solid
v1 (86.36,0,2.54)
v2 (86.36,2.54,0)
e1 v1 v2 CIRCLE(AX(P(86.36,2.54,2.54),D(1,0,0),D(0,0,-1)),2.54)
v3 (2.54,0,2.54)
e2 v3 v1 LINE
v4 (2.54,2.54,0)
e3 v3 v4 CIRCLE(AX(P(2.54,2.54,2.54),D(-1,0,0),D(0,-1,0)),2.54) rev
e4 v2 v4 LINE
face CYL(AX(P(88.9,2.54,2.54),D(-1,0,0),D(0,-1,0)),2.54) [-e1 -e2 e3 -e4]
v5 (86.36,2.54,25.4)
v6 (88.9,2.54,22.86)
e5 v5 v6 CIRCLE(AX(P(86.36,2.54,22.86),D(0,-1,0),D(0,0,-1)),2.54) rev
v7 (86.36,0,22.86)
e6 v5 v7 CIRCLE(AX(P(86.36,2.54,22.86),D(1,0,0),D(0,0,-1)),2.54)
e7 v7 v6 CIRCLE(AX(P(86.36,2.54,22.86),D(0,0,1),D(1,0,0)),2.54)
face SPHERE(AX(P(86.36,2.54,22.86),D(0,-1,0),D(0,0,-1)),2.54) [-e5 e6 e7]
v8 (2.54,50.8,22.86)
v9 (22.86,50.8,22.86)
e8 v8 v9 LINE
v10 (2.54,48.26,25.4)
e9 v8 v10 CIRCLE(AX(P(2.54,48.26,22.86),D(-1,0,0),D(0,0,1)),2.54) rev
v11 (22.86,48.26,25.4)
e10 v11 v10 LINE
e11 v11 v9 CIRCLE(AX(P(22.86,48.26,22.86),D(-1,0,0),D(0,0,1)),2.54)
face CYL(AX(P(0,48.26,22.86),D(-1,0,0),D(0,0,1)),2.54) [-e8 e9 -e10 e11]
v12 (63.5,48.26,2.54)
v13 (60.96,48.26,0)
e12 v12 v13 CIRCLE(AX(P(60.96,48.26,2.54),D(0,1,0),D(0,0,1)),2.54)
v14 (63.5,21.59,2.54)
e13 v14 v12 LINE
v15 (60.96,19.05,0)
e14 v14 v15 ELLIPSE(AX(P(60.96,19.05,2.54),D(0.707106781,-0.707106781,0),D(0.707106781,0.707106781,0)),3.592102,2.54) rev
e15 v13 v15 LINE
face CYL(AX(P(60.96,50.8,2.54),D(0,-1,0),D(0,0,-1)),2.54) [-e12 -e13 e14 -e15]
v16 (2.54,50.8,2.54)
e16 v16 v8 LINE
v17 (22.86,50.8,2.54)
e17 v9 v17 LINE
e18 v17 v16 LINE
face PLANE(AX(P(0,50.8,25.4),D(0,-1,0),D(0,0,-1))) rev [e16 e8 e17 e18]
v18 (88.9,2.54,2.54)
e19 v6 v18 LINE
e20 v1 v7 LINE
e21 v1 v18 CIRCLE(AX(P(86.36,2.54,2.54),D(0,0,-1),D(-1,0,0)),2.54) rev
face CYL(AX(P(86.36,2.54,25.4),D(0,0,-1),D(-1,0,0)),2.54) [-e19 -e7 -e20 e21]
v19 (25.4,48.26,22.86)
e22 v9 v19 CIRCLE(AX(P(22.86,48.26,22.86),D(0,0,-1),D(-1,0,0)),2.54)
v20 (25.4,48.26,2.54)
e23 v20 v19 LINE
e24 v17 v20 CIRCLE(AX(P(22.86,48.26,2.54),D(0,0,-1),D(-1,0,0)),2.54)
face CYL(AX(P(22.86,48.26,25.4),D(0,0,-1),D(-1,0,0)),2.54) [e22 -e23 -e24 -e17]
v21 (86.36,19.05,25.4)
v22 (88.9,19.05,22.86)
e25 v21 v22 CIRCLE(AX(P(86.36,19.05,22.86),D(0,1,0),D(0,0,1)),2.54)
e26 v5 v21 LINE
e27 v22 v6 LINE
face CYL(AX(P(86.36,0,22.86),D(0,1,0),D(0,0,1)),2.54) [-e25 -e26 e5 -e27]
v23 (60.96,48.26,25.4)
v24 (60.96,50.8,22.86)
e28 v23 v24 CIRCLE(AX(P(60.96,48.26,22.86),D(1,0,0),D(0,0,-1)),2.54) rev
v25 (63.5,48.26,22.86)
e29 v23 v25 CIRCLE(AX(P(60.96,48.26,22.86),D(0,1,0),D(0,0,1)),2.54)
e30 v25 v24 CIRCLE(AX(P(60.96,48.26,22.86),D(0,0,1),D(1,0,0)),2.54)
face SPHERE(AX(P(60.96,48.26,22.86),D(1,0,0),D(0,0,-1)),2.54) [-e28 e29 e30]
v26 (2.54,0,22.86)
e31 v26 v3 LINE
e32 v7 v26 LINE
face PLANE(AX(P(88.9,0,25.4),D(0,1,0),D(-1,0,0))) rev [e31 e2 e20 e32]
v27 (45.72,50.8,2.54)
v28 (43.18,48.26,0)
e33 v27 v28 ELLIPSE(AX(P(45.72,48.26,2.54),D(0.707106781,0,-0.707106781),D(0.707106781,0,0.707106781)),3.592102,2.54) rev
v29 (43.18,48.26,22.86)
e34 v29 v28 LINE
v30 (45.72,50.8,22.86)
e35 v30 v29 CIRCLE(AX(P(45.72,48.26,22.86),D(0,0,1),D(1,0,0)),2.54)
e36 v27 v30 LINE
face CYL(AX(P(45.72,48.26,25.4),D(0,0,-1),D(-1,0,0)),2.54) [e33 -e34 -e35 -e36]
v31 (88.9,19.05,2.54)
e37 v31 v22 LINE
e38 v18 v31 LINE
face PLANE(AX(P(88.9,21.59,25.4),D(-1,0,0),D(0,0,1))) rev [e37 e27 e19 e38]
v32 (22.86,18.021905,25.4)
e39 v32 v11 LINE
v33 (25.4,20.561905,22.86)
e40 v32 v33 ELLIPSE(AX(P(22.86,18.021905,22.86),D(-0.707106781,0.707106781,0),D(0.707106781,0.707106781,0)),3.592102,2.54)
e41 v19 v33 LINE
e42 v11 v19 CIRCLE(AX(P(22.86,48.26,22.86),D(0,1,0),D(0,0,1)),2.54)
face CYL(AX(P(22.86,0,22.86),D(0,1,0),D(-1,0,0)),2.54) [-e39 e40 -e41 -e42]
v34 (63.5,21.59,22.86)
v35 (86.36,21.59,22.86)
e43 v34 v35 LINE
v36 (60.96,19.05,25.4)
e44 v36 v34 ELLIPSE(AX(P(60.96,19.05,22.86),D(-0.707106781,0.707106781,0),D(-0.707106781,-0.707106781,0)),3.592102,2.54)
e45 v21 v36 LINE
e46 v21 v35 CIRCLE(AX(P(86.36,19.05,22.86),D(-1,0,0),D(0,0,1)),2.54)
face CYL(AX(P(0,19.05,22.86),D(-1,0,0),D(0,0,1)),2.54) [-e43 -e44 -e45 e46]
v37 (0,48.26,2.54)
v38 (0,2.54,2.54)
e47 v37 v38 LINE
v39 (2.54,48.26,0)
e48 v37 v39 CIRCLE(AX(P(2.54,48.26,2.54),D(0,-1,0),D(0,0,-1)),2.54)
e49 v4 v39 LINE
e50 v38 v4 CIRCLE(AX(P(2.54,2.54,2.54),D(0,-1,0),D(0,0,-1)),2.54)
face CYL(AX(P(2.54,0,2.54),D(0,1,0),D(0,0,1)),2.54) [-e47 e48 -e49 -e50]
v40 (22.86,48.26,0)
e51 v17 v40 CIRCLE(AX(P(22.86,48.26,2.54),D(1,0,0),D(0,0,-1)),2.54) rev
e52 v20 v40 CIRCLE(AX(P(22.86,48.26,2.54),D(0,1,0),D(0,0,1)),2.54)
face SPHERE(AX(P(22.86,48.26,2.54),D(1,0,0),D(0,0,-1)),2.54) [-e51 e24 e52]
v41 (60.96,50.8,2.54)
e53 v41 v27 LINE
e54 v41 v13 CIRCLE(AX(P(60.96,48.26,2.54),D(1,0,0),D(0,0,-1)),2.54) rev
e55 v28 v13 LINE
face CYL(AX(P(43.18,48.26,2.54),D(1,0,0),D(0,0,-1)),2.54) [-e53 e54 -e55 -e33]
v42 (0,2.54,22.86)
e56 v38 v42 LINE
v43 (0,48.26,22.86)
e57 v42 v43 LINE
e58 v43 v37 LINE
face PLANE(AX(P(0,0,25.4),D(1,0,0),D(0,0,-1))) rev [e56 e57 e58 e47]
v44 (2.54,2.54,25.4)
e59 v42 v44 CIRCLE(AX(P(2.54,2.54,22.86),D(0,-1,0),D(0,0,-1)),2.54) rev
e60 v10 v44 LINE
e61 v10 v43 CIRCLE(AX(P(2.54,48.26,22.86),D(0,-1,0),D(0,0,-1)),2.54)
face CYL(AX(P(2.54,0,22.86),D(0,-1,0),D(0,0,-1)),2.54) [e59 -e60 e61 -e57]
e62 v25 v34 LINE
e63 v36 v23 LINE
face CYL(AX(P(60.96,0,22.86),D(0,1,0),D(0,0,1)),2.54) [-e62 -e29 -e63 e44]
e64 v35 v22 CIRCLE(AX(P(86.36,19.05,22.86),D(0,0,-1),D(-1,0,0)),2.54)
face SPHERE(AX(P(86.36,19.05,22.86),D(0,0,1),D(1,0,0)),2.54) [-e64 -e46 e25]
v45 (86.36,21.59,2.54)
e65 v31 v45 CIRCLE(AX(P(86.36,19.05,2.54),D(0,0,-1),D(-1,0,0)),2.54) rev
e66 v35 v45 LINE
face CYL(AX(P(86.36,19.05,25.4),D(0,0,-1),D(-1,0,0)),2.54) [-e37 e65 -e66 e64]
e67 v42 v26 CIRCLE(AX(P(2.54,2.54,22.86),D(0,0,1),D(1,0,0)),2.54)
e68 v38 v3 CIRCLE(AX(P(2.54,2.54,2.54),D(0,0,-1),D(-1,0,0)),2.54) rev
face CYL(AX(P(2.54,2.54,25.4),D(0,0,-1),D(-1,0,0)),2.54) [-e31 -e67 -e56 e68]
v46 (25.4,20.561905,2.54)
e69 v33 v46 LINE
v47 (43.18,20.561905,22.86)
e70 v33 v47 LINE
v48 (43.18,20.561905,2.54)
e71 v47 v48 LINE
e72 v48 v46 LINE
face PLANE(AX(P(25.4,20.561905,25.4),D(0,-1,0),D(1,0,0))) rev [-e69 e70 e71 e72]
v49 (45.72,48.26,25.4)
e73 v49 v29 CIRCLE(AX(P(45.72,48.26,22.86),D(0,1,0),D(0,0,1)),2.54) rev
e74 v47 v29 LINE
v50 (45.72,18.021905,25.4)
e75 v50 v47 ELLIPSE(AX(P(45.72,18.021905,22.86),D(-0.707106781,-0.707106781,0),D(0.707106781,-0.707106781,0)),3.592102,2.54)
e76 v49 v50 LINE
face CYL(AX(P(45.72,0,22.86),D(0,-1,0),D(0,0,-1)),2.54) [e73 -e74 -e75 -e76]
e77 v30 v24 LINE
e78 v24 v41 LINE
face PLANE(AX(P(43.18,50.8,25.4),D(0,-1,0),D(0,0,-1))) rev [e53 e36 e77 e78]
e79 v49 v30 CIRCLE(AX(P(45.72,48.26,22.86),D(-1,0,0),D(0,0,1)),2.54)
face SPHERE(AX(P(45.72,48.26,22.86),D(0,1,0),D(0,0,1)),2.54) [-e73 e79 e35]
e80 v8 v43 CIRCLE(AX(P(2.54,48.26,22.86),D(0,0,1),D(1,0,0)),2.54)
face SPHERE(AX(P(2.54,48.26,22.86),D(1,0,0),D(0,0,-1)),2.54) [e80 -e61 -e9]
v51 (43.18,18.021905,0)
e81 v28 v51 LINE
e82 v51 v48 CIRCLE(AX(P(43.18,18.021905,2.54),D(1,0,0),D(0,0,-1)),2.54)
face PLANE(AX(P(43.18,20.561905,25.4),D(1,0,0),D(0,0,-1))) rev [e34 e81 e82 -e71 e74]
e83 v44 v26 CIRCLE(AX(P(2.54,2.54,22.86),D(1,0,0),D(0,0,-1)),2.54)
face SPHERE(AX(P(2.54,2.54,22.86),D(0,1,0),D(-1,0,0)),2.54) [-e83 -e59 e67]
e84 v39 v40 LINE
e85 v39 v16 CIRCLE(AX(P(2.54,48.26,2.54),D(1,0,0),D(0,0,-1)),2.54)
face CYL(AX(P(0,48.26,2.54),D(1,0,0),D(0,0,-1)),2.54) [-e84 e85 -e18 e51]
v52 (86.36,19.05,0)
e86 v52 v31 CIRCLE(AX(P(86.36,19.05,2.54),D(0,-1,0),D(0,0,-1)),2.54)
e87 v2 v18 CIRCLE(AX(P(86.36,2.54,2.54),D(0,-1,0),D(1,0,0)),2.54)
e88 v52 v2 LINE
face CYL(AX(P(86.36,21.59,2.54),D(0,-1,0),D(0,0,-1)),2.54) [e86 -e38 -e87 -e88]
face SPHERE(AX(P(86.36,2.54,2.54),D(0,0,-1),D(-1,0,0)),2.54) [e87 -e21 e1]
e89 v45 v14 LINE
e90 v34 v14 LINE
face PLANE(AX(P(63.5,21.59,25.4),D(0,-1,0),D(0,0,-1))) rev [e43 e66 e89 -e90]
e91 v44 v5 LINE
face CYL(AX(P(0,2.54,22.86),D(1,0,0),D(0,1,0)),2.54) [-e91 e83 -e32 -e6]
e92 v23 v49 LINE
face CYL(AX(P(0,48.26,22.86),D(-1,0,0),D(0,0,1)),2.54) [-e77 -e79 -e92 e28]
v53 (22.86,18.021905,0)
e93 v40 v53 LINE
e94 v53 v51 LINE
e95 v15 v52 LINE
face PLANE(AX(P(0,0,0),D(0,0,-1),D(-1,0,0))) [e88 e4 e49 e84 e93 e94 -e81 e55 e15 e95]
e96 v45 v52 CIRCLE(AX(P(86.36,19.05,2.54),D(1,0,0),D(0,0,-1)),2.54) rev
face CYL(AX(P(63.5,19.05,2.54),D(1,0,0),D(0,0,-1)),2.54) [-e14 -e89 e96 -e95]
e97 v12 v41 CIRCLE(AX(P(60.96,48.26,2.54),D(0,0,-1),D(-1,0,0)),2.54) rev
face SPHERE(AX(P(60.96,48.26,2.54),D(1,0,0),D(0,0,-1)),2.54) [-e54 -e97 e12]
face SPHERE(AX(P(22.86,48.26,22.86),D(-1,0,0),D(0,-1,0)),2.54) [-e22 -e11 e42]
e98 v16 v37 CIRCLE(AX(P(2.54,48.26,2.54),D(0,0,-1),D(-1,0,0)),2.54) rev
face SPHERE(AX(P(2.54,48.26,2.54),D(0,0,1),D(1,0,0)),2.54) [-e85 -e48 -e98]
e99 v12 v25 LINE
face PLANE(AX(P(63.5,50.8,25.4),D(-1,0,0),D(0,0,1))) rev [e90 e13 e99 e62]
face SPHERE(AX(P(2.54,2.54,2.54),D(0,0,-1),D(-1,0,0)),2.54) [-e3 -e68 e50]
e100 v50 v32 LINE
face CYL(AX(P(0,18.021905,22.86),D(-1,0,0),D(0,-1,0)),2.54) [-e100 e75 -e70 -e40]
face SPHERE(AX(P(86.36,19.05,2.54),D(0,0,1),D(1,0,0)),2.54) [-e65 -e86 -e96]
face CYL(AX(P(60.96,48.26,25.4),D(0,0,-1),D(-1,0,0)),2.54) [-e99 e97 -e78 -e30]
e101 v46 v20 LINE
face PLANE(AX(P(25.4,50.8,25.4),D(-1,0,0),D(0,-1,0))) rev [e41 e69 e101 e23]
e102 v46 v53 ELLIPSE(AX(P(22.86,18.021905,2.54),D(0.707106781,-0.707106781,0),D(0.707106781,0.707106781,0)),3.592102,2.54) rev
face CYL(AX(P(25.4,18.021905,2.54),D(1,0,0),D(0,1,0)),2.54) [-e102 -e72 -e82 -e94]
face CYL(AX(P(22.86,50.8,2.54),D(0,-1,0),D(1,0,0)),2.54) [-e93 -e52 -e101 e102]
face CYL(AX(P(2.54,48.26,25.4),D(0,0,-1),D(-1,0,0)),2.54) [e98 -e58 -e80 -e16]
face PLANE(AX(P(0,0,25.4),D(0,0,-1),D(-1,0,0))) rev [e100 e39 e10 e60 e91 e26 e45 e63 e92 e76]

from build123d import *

# Parameters (mm, degrees)
BOSS_EXTRUDE2_DEPTH = 25.4
FILLET4_R           = 2.54
FILLET5_R           = 2.54
FILLET6_R           = 2.54


with BuildPart() as part:
    # Sketch1 → Boss-Extrude2 (new body)
    with BuildSketch(Plane.XY):
        Polygon((0, 0), (0, 50.8), (25.4, 50.8), (25.4, 20.561904762), (43.18, 20.561904762), (43.18, 50.8), (63.5, 50.8), (63.5, 21.59), (88.9, 21.59), (88.9, 0), align=None)
    extrude(amount=BOSS_EXTRUDE2_DEPTH)

    # Fillet4
    fillet4_edges = [part.edges().sort_by_distance(p)[0] for p in [
        (12.7, 50.8, 25.4),
    ]]
    fillet(fillet4_edges, radius=FILLET4_R)

    # Fillet5
    fillet5_edges = [part.edges().sort_by_distance(p)[0] for p in [
        (12.7, 50.8, 0),
        (25.4, 35.680952381, 0),
        (34.29, 20.561904762, 0),
        (53.34, 50.8, 0),
        (63.5, 36.195, 0),
        (76.2, 21.59, 25.4),
        (76.2, 21.59, 0),
        (63.5, 36.195, 25.4),
        (43.18, 50.8, 12.7),
        (63.5, 50.8, 12.7),
        (88.9, 21.59, 12.7),
        (53.34, 50.8, 25.4),
        (43.18, 35.680952381, 25.4),
        (34.29, 20.561904762, 25.4),
        (0, 24.13, 25.4),
        (0, 50.8, 11.43),
        (0, 50.056051224, 24.656051224),
        (25.4, 50.8, 11.43),
        (25.4, 50.056051224, 24.656051224),
        (25.4, 34.410952381, 25.4),
    ]]
    fillet(fillet5_edges, radius=FILLET5_R)

    # Fillet6
    # the kernel refuses this fillet: 2.54 mm, written as the material it takes off along each edge
    with BuildSketch(Plane(origin=(86.36, 19.05, 2.54), x_dir=(0, 0, -1), z_dir=(1, 0, 0))) as fillet6_piece_1_section:
        Polygon((0, 0), (FILLET6_R, 0), (FILLET6_R, FILLET6_R), (0, FILLET6_R), align=None)
    fillet6_piece_1 = extrude(amount=FILLET6_R, mode=Mode.PRIVATE)
    fillet6_piece_1 = fillet6_piece_1 - Plane(origin=(86.36, 19.05, 2.54), x_dir=(0, -0.7071067811865475, 0.7071067811865475), z_dir=(1, 0, 0)) * Sphere(FILLET6_R, mode=Mode.PRIVATE)
    add(fillet6_piece_1, mode=Mode.SUBTRACT)
    with BuildSketch(Plane(origin=(86.36, 19.05, 22.86), x_dir=(0, 0, 1), z_dir=(1, 0, 0))) as fillet6_piece_2_section:
        Polygon((0, 0), (FILLET6_R, 0), (FILLET6_R, -FILLET6_R), (0, -FILLET6_R), align=None)
    fillet6_piece_2 = extrude(amount=FILLET6_R, mode=Mode.PRIVATE)
    fillet6_piece_2 = fillet6_piece_2 - Plane(origin=(86.36, 19.05, 22.86), x_dir=(0, -0.7071067811865475, -0.7071067811865475), z_dir=(1, 0, 0)) * Sphere(FILLET6_R, mode=Mode.PRIVATE)
    add(fillet6_piece_2, mode=Mode.SUBTRACT)
    with BuildSketch(Plane(origin=(2.54, 48.26, 2.54), x_dir=(0, 0, -1), z_dir=(-1, 0, 0))) as fillet6_piece_3_section:
        Polygon((0, 0), (FILLET6_R, 0), (FILLET6_R, -FILLET6_R), (0, -FILLET6_R), align=None)
    fillet6_piece_3 = extrude(amount=FILLET6_R, mode=Mode.PRIVATE)
    fillet6_piece_3 = fillet6_piece_3 - Plane(origin=(2.54, 48.26, 2.54), x_dir=(0, -0.7071067811865475, 0.7071067811865475), z_dir=(-1, 0, 0)) * Sphere(FILLET6_R, mode=Mode.PRIVATE)
    add(fillet6_piece_3, mode=Mode.SUBTRACT)
    with BuildSketch(Plane(origin=(86.36, 2.54, 2.54), x_dir=(0, -1, 0), z_dir=(1, 0, 0))) as fillet6_piece_4_section:
        Polygon((0, 0), (FILLET6_R, 0), (FILLET6_R, FILLET6_R), (0, FILLET6_R), align=None)
    fillet6_piece_4 = extrude(amount=FILLET6_R, mode=Mode.PRIVATE)
    fillet6_piece_4 = fillet6_piece_4 - Plane(origin=(86.36, 2.54, 2.54), x_dir=(0, 0.7071067811865475, 0.7071067811865475), z_dir=(1, 0, 0)) * Sphere(FILLET6_R, mode=Mode.PRIVATE)
    add(fillet6_piece_4, mode=Mode.SUBTRACT)
    with BuildSketch(Plane(origin=(2.54, 2.54, 2.54), x_dir=(0, -1, 0), z_dir=(-1, 0, 0))) as fillet6_piece_5_section:
        Polygon((0, 0), (FILLET6_R, 0), (FILLET6_R, -FILLET6_R), (0, -FILLET6_R), align=None)
    fillet6_piece_5 = extrude(amount=FILLET6_R, mode=Mode.PRIVATE)
    fillet6_piece_5 = fillet6_piece_5 - Plane(origin=(2.54, 2.54, 2.54), x_dir=(0, 0.7071067811865475, 0.7071067811865475), z_dir=(-1, 0, 0)) * Sphere(FILLET6_R, mode=Mode.PRIVATE)
    add(fillet6_piece_5, mode=Mode.SUBTRACT)
    with BuildSketch(Plane(origin=(86.36, 2.54, 22.86), x_dir=(0, 0, 1), z_dir=(1, 0, 0))) as fillet6_piece_6_section:
        Polygon((0, 0), (FILLET6_R, 0), (FILLET6_R, FILLET6_R), (0, FILLET6_R), align=None)
    fillet6_piece_6 = extrude(amount=FILLET6_R, mode=Mode.PRIVATE)
    fillet6_piece_6 = fillet6_piece_6 - Plane(origin=(86.36, 2.54, 22.86), x_dir=(0, 0.7071067811865475, -0.7071067811865475), z_dir=(1, 0, 0)) * Sphere(FILLET6_R, mode=Mode.PRIVATE)
    add(fillet6_piece_6, mode=Mode.SUBTRACT)
    with BuildSketch(Plane(origin=(88.9, 19.05, 0), x_dir=(0, 0, 1), z_dir=(0, -1, 0))) as fillet6_piece_7:
        with BuildLine():
            CenterArc((FILLET6_R, FILLET6_R), FILLET6_R, 180, 90)
            Line((0, FILLET6_R), (0, 0))
            Line((0, 0), (FILLET6_R, 0))
        make_face()
    extrude(amount=16.51, mode=Mode.SUBTRACT)
    with BuildSketch(Plane(origin=(86.36, 0, 0), x_dir=(0, 0, 1), z_dir=(-1, 0, 0)), Plane(origin=(86.36, 0, 25.4), x_dir=(0, 1, 0), z_dir=(-1, 0, 0))) as fillet6_piece_8:
        with BuildLine():
            CenterArc((FILLET6_R, FILLET6_R), FILLET6_R, 180, 90)
            Line((0, FILLET6_R), (0, 0))
            Line((0, 0), (FILLET6_R, 0))
        make_face()
    extrude(amount=83.82, mode=Mode.SUBTRACT)
    with BuildSketch(Plane(origin=(88.9, 0, 2.54), x_dir=(0, 1, 0), z_dir=(0, 0, 1))) as fillet6_piece_9:
        with BuildLine():
            CenterArc((FILLET6_R, FILLET6_R), FILLET6_R, 180, 90)
            Line((0, FILLET6_R), (0, 0))
            Line((0, 0), (FILLET6_R, 0))
        make_face()
    extrude(amount=20.32, mode=Mode.SUBTRACT)
    with BuildSketch(Plane(origin=(0, 0, 2.54), x_dir=(0, 1, 0), z_dir=(0, 0, 1))) as fillet6_piece_10:
        with BuildLine():
            CenterArc((FILLET6_R, -FILLET6_R), FILLET6_R, 90, 90)
            Line((0, -FILLET6_R), (0, 0))
            Line((0, 0), (FILLET6_R, 0))
        make_face()
    extrude(amount=20.32, mode=Mode.SUBTRACT)
    with BuildSketch(Plane(origin=(2.54, 0, 22.86), x_dir=(-1, 0, 0), z_dir=(0, 0, -1))) as fillet6_piece_11:
        with BuildLine():
            CenterArc((2.54 - FILLET6_R, FILLET6_R), FILLET6_R, 270, 90)
            Line((2.54 - FILLET6_R, 0), (2.54, 0))
            Line((2.54, 0), (2.54, FILLET6_R))
        make_face()
    revolve(axis=Axis((2.54, 0, 22.86), (0, 1, 0)), revolution_arc=90, mode=Mode.SUBTRACT)
    with BuildSketch(Plane(origin=(0, 2.54, 0), x_dir=(0, 0, 1), z_dir=(0, 1, 0))) as fillet6_piece_12:
        with BuildLine():
            CenterArc((FILLET6_R, FILLET6_R), FILLET6_R, 180, 90)
            Line((0, FILLET6_R), (0, 0))
            Line((0, 0), (FILLET6_R, 0))
        make_face()
    extrude(amount=45.72, mode=Mode.SUBTRACT)
    with BuildSketch(Plane(origin=(88.9, 19.05, 25.4), x_dir=(0, 0, -1), z_dir=(0, -1, 0))) as fillet6_piece_13:
        with BuildLine():
            CenterArc((FILLET6_R, -FILLET6_R), FILLET6_R, 90, 90)
            Line((0, -FILLET6_R), (0, 0))
            Line((0, 0), (FILLET6_R, 0))
        make_face()
    extrude(amount=16.51, mode=Mode.SUBTRACT)


solid = part.part
